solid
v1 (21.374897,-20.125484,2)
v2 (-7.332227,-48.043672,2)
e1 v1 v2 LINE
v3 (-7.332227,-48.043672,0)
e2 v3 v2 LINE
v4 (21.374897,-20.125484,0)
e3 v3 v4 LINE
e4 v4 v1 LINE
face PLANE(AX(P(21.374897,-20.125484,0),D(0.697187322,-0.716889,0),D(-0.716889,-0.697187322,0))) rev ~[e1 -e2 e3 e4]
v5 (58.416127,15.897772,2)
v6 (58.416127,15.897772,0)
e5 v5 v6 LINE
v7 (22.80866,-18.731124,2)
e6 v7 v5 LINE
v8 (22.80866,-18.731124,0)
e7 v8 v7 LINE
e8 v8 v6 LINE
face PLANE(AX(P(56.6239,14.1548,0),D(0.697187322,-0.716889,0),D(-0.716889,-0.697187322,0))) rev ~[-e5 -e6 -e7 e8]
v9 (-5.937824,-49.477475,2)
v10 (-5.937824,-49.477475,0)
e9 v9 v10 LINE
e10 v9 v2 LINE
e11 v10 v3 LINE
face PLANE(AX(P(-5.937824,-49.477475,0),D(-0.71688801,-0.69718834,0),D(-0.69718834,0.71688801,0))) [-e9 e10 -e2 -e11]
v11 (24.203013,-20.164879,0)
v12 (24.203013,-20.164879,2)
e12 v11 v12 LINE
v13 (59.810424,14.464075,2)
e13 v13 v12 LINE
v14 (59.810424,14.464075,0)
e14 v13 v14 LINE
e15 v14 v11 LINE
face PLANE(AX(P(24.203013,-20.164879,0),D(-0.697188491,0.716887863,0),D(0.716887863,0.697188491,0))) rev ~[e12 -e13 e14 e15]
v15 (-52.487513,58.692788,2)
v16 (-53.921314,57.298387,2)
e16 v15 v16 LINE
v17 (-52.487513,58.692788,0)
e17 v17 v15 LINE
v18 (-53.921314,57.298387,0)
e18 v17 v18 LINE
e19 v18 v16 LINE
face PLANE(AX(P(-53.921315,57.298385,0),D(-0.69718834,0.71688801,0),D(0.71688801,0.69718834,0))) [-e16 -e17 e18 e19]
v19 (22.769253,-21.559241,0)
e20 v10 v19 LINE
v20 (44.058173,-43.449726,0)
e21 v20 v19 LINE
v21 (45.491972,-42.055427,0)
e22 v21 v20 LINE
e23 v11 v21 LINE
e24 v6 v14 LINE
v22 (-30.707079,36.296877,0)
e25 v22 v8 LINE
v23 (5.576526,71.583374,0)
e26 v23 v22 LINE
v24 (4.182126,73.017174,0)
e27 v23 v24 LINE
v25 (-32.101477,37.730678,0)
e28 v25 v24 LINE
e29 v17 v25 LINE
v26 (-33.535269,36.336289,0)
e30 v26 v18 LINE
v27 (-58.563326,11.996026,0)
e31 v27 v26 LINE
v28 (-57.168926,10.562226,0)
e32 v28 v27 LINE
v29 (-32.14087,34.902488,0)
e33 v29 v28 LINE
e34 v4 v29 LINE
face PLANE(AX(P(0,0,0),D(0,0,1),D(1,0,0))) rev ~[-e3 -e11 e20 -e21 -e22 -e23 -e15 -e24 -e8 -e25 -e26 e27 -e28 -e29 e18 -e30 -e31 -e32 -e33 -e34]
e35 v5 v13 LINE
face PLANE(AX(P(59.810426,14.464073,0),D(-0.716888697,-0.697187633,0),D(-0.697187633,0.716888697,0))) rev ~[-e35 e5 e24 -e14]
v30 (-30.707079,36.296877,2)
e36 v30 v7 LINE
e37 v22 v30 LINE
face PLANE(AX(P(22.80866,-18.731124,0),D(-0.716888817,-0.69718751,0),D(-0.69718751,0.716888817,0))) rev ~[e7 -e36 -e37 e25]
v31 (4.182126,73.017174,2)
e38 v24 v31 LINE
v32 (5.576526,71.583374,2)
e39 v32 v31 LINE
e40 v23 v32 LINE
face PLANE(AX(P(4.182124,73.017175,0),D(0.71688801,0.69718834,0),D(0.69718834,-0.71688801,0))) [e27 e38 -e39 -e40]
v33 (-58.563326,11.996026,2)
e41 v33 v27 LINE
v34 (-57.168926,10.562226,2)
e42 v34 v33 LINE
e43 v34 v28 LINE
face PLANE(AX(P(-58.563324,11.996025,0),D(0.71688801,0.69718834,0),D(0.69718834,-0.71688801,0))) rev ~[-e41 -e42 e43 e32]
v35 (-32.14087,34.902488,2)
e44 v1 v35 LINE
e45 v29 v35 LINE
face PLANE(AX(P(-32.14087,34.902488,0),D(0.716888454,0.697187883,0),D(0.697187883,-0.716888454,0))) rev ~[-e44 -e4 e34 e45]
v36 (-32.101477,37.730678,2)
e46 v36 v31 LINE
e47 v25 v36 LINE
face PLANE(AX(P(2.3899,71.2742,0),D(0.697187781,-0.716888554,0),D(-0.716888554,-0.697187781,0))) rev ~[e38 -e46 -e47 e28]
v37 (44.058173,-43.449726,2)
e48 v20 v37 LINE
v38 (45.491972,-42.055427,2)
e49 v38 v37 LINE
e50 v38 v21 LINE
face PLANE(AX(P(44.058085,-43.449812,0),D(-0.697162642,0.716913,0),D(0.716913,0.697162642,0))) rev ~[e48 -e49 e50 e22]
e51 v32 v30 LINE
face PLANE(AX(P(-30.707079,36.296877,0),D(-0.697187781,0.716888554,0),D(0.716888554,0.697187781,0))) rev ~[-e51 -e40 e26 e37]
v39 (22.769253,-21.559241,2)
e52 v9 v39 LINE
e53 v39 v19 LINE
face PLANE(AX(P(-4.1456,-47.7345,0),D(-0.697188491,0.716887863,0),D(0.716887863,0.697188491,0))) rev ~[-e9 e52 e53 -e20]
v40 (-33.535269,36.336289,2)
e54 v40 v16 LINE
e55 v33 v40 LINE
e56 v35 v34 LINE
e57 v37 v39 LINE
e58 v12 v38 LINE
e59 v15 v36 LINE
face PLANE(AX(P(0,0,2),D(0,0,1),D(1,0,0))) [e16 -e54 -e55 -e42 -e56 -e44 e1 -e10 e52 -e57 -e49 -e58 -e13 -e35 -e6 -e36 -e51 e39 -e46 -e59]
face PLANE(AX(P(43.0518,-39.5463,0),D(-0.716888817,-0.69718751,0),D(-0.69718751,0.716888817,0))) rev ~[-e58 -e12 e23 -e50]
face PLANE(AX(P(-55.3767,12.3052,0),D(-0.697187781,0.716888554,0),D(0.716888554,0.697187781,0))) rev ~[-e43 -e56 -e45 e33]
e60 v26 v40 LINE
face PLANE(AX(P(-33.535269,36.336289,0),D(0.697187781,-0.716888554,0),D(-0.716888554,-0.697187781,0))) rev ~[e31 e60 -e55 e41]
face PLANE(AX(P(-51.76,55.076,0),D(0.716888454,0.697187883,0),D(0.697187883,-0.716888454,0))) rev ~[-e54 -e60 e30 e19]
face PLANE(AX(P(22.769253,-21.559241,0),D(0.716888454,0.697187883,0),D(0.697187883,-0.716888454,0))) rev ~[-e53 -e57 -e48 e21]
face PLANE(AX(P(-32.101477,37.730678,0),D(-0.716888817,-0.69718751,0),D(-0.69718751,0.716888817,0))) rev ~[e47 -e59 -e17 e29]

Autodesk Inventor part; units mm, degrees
ref_plane "YZ Plane" through (0, 0, 0) normal (1, 0, 0) x (0, 1, 0)
ref_plane "XZ Plane" through (0, 0, 0) normal (0, 1, 0) x (-1, 0, 0)
ref_plane "XY Plane" through (0, 0, 0) normal (0, 0, 1) x (1, 0, 0)
sketch "Sketch1" plane through (0, 0, 0) normal (0, 0, 1) x (1, 0, 0)
  arc A0 (5.5811, -56.8606) -> (20.209, -64.6836) centre (38.8796, -12.1848) ccw construction
  arc A1 (-7.6539, -43.4667) -> (5.5811, -56.8606) centre (37.8873, -11.7018) ccw construction
  arc A2 (-7.6539, -43.4667) -> (-31.2183, -12.0793) centre (-386.265, -303.1724) ccw construction
  arc A3 (-31.2183, -12.0793) -> (-63.3277, 19.0744) centre (-191.6112, -145.2692) ccw construction
  arc A4 (-67.5206, 26.3221) -> (-63.3277, 19.0744) centre (-54.6162, 28.9507) ccw construction
  arc A5 (-66.9469, 41.0059) -> (-67.5206, 26.3221) centre (-15.6776, 31.6496) ccw construction
  line L0 (-66.9469, 41.0059) -> (-50.7446, 56.9005) construction
  arc A6 (-3.6955, 79.7027) -> (-26.0985, 81.0785) centre (-17.6076, 36.2535) ccw construction
  arc A7 (1.4491, 74.6716) -> (-3.6955, 79.7027) centre (-6.1453, 72.0517) ccw construction
  arc A8 (2.6831, 69.1533) -> (1.4491, 74.6716) centre (-18.5892, 67.2935) ccw construction
  arc A9 (2.6831, 69.1533) -> (3.1898, 63.5624) centre (229.5421, 86.8959) ccw construction
  arc A10 (3.1898, 63.5624) -> (8.7161, 49.818) centre (30.4167, 66.5265) ccw construction
  arc A11 (8.7161, 49.818) -> (19.0471, 39.3259) centre (47.1297, 77.3097) ccw construction
  arc A12 (19.0471, 39.3259) -> (32.6891, 29.8296) centre (104.4845, 147.5139) ccw construction
  arc A13 (32.6891, 29.8296) -> (50.5655, 19.6706) centre (502.3948, 835.5524) ccw construction
  arc A14 (57.8671, 12.5741) -> (50.5655, 19.6706) centre (33.0101, -5.6965) ccw construction
  arc A15 (67.0572, -4.125) -> (57.8671, 12.5741) centre (18.4686, -19.9867) ccw construction
  arc A16 (68.9532, -23.0115) -> (67.0572, -4.125) centre (24.8632, -17.8992) ccw construction
  line L1 (-52.1723, 55.4999) -> (-51.76, 55.076) construction
  line L2 (43.4701, -39.9764) -> (43.0518, -39.5463) construction
  line L3 (42.0363, -41.3708) -> (43.4701, -39.9764) construction
  line L4 (-4.1456, -47.7345) -> (58.0182, 12.7211)
  line L5 (56.6239, 14.1548) -> (-5.54, -46.3007)
  line L6 (-55.3767, 12.3052) -> (3.7843, 69.8404)
  line L7 (2.3899, 71.2742) -> (-56.7711, 13.739)
  line L8 (-56.7711, 13.739) -> (-55.3767, 12.3052)
  line L9 (2.3899, 71.2742) -> (3.7843, 69.8404)
  line L10 (-52.1723, 55.4999) -> (-50.7446, 56.9005) construction
  line L11 (-4.1456, -47.7345) -> (-5.54, -46.3007)
  line L12 (58.0182, 12.7211) -> (56.6239, 14.1548)
  line L13 (-51.76, 55.076) -> (-50.3262, 56.4704)
  line L14 (41.618, -40.9406) -> (43.0518, -39.5463)
  line L15 (-51.76, 55.076) -> (41.618, -40.9406)
  line L16 (-50.3262, 56.4704) -> (-50.7446, 56.9005) construction
  line L17 (-50.7446, 56.9005) -> (-26.0985, 81.0785) construction
  line L18 (43.0518, -39.5463) -> (-50.3262, 56.4704)
  line L19 (41.618, -40.9406) -> (42.0363, -41.3708) construction
  point P0 (0, 0)
  point P1 (-8.2693, 4.2237)
  point P2 (-4.9861, 4.7501)
  point P3 (-66.0155, 22.3561)
  point P4 (24.203, -20.1649)
  point P5 (22.8086, -18.7311)
  point P6 (-30.7071, 36.2969)
  point P7 (-32.1015, 37.7306)
  point P8 (-33.5353, 36.3363)
  point P9 (-32.1409, 34.9025)
  point P10 (21.3749, -20.1255)
  point P11 (22.7692, -21.5593)
  point P12 (22.8086, -18.7311)
  point P13 (-30.7071, 36.2969)
  point P14 (-32.1409, 34.9025)
  point P15 (21.3749, -20.1255)
  point P16 (24.203, -20.1649)
  point P17 (22.7692, -21.5593)
  point P18 (-33.5353, 36.3363)
  point P19 (-32.1015, 37.7306)
  dimension "d244" = 2
  dimension "d245" = 2
  dimension "d251" = 0.6
  dimension "d252" = 0.6
  dimension "d253" = 2
extrude "Extrusion12" add sketch "Sketch1" along normal blind 2
move faces "Move1" translate (1.7922, 1.743, 0) faces at (3.3195, 70.3184, 0.6667)
move faces "Move2" translate (1.7922, 1.743, 0) faces at (57.5534, 13.199, 0.6667)
move faces "Move3" translate (-1.7922, -1.743, 0) faces at (-4.6104, -47.2565, 1.3333)
move faces "Move4" translate (-1.7922, -1.743, 0) faces at (-56.3063, 13.2611, 0.6667)
move faces "Move5" translate (-2.1613, 2.2224, 0) faces at (-50.8042, 56.0056, 0.6667)
move faces "Move6" translate (2.4402, -2.5091, 0) faces at (42.0959, -40.4758, 0.6667)
properties part number "print009_Guss_innen_erweitert"
